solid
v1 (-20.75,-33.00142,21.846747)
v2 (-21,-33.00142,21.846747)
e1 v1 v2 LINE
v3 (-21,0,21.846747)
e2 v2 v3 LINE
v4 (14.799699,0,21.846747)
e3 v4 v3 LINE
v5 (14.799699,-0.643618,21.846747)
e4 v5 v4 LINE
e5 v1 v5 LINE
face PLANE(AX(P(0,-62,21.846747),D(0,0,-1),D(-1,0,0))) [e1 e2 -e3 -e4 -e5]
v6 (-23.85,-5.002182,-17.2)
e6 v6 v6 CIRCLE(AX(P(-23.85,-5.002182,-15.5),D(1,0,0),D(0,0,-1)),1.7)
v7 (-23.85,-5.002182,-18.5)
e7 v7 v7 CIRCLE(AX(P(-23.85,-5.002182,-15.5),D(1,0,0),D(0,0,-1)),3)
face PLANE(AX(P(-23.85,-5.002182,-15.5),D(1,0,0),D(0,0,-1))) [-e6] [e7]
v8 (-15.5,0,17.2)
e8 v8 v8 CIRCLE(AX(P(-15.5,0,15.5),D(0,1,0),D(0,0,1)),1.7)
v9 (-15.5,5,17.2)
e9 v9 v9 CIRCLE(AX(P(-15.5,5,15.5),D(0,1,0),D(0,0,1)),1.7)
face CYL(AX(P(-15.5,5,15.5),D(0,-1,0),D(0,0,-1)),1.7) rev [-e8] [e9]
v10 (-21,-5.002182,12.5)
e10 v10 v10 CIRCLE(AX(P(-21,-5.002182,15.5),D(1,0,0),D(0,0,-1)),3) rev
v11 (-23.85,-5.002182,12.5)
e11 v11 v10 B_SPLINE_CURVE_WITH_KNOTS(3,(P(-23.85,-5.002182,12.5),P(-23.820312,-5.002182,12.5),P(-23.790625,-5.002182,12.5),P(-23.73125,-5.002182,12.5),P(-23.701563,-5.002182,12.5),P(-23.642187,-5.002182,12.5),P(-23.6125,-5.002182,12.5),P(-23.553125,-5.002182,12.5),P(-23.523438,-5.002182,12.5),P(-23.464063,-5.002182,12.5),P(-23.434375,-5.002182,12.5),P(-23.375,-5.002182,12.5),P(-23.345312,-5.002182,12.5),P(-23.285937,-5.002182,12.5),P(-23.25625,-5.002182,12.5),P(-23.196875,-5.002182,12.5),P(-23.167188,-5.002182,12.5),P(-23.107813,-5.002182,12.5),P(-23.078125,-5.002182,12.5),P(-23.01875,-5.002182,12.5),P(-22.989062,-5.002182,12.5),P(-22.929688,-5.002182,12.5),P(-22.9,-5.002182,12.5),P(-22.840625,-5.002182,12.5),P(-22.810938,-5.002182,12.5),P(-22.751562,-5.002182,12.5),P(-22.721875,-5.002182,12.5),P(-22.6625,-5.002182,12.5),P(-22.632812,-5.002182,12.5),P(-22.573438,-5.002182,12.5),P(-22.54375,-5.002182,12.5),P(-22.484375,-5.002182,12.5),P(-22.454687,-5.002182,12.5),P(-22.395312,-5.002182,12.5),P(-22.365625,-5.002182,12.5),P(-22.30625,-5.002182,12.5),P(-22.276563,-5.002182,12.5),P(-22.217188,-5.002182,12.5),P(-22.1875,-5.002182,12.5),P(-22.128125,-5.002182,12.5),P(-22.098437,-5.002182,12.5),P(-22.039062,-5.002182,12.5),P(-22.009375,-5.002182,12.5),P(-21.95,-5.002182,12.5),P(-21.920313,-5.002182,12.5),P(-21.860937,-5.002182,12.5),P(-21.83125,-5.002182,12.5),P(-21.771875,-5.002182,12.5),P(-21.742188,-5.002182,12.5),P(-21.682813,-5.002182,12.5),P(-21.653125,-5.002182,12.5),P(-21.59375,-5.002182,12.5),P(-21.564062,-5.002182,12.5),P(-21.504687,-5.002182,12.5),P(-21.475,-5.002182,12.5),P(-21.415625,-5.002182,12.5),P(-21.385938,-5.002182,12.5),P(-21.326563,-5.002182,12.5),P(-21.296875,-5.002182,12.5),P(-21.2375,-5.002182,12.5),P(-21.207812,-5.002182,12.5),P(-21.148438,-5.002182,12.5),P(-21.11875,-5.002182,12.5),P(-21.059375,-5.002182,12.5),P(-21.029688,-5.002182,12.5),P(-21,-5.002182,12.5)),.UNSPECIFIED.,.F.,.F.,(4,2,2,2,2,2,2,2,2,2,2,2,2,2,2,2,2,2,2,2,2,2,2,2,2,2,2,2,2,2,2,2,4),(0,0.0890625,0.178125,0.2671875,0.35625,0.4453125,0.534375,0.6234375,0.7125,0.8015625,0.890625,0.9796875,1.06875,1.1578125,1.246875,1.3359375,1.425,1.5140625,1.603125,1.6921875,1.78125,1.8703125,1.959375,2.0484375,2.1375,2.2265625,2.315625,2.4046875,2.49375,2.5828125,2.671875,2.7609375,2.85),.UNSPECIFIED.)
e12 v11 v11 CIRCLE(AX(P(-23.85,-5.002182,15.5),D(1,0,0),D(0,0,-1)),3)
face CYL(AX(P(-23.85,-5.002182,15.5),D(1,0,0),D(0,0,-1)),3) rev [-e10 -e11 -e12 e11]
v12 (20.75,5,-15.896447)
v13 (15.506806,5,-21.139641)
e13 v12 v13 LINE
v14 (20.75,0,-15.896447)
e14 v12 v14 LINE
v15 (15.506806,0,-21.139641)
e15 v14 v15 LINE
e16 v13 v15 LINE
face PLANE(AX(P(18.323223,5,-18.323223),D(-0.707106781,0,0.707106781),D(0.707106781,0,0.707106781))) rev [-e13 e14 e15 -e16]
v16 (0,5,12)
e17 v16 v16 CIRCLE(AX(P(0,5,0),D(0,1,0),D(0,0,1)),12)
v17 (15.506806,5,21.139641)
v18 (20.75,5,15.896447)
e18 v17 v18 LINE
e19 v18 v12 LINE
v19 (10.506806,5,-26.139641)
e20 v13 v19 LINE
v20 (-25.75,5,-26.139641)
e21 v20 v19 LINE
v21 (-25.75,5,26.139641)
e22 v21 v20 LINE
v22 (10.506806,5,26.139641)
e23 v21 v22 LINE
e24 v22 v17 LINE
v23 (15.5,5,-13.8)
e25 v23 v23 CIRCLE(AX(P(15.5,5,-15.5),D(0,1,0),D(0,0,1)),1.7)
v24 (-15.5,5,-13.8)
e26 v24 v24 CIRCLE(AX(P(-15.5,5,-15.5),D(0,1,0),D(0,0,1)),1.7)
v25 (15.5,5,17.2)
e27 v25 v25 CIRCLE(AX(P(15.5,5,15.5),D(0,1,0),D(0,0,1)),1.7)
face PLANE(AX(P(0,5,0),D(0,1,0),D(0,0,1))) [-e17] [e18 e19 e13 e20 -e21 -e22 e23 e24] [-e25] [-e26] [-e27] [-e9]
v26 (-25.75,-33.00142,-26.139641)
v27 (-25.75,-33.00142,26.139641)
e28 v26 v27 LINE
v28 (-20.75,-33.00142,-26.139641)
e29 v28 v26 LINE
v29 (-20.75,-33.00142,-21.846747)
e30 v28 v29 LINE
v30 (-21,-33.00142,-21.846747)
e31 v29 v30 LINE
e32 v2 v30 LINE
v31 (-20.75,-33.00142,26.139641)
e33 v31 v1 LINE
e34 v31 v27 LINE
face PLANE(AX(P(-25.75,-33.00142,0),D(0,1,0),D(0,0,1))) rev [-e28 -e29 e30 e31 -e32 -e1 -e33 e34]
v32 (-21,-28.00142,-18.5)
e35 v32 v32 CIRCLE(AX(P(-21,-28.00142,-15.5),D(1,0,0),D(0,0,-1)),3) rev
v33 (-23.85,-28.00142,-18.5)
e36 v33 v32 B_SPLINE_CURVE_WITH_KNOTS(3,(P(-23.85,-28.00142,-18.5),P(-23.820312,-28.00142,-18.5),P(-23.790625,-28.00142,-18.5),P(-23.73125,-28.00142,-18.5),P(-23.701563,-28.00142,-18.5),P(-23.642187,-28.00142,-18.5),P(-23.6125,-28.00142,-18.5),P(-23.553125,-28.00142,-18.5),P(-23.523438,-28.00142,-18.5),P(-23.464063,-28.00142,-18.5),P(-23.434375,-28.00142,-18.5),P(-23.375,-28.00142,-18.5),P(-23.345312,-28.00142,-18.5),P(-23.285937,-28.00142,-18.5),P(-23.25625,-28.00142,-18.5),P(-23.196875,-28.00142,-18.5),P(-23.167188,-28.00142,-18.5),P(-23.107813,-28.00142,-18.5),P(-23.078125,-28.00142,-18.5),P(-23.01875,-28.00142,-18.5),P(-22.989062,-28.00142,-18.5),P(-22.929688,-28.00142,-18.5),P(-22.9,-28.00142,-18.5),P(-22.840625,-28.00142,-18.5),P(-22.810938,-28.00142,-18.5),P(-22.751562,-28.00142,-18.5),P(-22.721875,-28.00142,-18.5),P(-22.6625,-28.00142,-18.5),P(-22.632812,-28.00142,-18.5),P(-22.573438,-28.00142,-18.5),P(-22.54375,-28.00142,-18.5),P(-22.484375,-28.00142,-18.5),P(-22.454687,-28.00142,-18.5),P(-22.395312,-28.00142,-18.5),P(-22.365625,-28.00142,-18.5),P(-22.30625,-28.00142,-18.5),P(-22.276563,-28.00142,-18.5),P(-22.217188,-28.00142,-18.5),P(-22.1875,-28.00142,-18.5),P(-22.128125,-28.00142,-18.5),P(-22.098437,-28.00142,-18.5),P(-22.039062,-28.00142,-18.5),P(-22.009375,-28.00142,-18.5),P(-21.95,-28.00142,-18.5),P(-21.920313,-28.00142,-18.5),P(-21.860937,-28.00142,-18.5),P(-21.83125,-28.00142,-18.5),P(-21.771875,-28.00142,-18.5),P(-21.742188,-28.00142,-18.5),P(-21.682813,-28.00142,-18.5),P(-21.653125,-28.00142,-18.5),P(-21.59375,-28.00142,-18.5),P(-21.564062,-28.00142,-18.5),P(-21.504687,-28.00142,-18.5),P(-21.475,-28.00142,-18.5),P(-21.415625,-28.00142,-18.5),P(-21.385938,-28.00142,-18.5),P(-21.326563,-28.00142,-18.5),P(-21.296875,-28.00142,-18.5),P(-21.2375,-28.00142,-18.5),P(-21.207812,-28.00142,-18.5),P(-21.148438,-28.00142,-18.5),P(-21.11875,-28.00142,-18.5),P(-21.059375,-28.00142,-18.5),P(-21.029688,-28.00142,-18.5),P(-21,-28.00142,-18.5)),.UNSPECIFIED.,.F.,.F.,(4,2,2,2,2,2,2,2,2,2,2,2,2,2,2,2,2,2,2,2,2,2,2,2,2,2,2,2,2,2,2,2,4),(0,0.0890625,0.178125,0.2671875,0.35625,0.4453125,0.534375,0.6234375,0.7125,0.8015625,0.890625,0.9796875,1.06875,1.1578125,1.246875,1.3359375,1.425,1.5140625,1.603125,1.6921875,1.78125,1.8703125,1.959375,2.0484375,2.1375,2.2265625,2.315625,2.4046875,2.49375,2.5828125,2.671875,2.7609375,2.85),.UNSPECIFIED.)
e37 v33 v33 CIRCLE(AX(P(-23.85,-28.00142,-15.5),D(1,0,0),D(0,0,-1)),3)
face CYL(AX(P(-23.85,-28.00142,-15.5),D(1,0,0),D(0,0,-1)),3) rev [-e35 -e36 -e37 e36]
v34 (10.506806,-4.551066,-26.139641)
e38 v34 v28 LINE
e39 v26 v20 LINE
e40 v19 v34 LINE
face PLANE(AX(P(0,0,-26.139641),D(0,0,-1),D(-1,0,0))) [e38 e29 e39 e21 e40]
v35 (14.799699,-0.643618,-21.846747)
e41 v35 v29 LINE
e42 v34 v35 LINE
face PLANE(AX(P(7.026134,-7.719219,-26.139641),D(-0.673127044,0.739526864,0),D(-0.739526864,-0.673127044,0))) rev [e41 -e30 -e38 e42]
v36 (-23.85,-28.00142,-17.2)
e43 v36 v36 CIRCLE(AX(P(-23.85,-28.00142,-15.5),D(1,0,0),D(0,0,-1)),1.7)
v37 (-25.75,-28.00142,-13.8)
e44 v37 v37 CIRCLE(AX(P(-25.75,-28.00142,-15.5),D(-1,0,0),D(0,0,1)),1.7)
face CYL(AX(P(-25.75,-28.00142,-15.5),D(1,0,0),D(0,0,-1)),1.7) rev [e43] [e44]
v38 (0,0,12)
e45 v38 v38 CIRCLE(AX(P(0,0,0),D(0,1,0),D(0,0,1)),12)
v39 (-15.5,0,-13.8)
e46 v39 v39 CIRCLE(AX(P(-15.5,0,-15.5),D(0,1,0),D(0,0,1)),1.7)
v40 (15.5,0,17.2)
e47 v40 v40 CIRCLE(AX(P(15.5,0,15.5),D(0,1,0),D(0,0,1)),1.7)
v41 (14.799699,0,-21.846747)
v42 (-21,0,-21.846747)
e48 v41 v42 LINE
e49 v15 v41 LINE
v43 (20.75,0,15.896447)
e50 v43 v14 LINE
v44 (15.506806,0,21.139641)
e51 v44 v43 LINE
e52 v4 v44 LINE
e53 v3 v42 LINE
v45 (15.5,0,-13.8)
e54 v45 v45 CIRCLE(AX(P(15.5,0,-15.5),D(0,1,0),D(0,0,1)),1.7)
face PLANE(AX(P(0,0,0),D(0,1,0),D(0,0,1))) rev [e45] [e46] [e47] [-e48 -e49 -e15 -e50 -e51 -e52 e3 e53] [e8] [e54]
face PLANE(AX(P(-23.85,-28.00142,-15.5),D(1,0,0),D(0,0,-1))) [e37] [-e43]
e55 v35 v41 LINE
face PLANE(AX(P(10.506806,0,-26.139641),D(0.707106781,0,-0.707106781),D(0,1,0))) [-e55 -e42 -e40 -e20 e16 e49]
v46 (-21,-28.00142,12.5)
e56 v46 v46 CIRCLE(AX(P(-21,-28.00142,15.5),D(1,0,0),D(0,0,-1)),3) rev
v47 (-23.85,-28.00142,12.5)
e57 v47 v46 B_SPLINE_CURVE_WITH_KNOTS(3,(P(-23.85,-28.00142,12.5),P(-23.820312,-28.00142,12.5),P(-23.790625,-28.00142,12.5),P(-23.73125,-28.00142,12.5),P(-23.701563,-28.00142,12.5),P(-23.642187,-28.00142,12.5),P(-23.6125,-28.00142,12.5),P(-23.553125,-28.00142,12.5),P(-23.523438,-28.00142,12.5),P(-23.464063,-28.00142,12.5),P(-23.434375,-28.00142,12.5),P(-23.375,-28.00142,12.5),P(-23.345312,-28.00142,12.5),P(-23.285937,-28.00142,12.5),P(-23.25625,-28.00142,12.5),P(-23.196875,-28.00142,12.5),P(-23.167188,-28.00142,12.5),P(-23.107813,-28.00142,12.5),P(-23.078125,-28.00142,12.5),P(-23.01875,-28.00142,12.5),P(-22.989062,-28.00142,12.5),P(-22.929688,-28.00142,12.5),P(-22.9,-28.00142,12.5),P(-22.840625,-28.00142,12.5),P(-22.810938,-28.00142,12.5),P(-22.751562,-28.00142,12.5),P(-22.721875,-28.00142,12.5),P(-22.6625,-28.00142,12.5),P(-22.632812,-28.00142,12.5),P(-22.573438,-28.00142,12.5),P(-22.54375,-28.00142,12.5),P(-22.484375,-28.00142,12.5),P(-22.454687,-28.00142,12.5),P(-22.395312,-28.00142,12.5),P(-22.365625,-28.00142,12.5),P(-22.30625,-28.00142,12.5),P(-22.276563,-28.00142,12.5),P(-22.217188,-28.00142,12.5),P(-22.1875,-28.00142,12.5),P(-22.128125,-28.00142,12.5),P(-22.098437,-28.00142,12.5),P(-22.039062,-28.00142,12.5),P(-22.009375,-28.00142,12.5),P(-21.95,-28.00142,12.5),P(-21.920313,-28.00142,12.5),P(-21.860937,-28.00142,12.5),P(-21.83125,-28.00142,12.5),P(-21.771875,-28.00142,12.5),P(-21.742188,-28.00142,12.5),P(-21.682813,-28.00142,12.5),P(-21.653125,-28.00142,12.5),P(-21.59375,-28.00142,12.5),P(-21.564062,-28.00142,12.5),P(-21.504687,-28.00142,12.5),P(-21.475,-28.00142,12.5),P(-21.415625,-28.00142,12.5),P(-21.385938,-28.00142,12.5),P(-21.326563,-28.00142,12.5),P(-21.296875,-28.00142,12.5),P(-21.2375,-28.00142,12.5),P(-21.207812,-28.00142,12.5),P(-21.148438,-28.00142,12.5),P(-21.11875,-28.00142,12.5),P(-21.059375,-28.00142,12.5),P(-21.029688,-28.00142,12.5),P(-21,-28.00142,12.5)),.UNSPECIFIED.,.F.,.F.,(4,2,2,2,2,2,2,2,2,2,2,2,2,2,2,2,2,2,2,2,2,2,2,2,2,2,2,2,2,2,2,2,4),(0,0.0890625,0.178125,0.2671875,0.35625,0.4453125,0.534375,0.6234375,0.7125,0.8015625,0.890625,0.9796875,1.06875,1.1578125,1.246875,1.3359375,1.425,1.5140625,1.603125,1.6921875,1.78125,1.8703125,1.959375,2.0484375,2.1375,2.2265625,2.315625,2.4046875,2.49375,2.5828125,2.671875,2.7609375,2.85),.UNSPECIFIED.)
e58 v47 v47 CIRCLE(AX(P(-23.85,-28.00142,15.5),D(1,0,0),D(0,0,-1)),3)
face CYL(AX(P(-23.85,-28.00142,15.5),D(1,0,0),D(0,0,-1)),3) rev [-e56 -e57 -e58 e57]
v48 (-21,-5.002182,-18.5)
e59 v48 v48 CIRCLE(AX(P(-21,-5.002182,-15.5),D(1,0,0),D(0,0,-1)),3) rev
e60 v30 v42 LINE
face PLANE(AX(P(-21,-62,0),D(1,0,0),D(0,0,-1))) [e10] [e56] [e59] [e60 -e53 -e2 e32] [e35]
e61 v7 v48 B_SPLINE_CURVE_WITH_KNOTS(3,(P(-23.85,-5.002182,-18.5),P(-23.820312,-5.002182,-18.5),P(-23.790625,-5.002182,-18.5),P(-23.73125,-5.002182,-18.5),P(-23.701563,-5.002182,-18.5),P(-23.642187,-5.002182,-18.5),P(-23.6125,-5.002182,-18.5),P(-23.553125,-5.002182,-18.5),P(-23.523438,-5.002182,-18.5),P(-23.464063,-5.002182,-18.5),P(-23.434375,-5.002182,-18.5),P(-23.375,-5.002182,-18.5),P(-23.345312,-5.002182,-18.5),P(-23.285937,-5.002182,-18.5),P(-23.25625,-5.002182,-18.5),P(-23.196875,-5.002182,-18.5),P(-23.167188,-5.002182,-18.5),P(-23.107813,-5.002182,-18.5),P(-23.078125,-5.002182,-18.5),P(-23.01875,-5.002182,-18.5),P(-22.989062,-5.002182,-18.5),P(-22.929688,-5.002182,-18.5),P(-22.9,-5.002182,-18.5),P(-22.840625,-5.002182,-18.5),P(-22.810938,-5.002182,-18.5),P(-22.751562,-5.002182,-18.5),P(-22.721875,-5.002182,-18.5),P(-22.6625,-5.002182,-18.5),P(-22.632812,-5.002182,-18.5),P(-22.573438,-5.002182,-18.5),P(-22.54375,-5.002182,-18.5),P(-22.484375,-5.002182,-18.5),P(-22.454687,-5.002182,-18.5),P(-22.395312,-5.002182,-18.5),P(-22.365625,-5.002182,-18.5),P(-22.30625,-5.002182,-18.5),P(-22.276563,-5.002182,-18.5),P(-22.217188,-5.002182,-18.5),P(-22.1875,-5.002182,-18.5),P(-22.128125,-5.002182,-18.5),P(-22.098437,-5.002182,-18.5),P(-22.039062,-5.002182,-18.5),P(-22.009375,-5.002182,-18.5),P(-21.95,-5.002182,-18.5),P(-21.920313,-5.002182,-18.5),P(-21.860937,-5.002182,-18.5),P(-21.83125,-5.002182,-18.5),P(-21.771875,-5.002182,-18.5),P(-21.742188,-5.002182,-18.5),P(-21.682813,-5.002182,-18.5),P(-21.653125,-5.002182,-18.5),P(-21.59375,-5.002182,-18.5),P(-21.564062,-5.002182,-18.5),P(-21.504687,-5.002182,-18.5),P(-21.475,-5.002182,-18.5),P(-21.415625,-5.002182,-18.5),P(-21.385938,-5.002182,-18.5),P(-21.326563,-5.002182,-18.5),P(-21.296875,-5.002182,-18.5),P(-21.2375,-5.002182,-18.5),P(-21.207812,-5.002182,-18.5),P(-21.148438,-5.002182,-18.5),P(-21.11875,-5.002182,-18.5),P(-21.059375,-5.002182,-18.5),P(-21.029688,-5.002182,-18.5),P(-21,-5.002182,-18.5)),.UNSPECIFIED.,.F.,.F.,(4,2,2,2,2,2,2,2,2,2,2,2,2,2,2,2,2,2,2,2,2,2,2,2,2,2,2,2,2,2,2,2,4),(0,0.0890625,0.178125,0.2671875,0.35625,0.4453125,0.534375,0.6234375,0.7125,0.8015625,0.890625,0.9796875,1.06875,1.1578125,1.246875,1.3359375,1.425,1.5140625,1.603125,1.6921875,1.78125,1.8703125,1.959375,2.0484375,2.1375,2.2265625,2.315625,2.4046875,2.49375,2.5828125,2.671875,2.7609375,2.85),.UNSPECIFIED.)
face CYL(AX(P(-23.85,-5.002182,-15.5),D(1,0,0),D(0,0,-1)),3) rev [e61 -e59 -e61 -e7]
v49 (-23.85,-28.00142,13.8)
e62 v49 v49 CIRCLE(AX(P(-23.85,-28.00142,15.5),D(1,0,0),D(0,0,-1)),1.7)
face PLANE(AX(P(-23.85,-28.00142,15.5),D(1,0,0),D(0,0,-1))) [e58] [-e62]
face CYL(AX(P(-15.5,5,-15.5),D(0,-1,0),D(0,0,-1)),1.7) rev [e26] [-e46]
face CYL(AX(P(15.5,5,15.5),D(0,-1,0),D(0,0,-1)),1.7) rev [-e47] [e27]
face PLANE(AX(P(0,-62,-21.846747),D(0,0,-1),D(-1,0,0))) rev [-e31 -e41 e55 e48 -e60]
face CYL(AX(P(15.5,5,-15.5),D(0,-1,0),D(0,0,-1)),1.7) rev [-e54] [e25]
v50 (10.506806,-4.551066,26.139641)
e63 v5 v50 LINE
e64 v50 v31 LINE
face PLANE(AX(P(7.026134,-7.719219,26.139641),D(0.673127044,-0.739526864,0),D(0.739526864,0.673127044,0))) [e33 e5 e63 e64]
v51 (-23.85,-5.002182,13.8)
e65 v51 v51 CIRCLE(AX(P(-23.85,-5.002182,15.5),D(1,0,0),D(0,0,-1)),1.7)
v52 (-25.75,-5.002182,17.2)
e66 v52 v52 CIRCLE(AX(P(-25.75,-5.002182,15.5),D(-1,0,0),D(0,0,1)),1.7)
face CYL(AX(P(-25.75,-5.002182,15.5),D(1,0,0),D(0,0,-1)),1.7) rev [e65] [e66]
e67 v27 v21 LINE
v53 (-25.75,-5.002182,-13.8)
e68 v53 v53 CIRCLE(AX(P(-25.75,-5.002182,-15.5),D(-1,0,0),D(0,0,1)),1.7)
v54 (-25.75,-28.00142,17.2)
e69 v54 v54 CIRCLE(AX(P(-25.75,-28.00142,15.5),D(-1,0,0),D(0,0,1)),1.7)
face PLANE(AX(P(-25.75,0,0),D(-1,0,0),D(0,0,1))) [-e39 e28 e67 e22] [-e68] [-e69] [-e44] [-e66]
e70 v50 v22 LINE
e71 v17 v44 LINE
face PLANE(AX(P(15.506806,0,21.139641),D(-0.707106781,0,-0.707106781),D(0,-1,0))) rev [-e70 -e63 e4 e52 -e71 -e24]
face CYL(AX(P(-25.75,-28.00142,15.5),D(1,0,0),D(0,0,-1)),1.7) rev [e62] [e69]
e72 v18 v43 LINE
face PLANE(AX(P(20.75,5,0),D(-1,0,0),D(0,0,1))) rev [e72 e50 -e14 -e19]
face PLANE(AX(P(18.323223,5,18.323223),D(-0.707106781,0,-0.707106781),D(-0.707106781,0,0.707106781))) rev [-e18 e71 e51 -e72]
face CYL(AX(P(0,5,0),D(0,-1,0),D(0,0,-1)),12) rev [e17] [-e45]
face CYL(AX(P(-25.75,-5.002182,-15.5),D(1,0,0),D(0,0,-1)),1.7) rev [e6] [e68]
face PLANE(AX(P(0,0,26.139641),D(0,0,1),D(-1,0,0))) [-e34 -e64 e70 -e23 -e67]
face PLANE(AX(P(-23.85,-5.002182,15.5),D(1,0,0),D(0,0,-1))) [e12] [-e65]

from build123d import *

# Parameters (mm, degrees)
SKETCH1_R                = 12
SKETCH1_R_2              = 1.7
BOSS_EXTRUDE1_DEPTH      = 5
BOSS_EXTRUDE3_DEPTH      = 5
BOSS_EXTRUDE4_DEPTH      = 5
CHAMFER1_SIZE            = 5
CHAMFER1_OF_MIRROR1_SIZE = 5
SKETCH7_R                = 3
CUT_EXTRUDE1_DEPTH       = 3.1
CUT_EXTRUDE2_DEPTH       = 33.001420077


# Read off the part's stored shape, not the designer's step: Cut-Extrude2
with BuildPart() as part:
    # Sketch1 → Boss-Extrude1 (new body)
    with BuildSketch(Plane(origin=(0, 0, 0), x_dir=(1, 0, 0), z_dir=(0, 1, 0))):
        Polygon((-20.75, 21.139640519), (-20.75, -21.139640519), (15.50680609, -21.139640519), (20.75, -15.896446609), (20.75, 15.896446609), (15.50680609, 21.139640519), align=None)
        with Locations(Location((0, 0, 0), (0, 0, 270))):
            Circle(SKETCH1_R, mode=Mode.SUBTRACT)
        with Locations(Location((15.5, 15.5, 0), (0, 0, 270))):
            Circle(SKETCH1_R_2, mode=Mode.SUBTRACT)
        with Locations(Location((-15.5, -15.5, 0), (0, 0, 270))):
            Circle(SKETCH1_R_2, mode=Mode.SUBTRACT)
        with Locations(Location((15.5, -15.5, 0), (0, 0, 270))):
            Circle(SKETCH1_R_2, mode=Mode.SUBTRACT)
        with Locations(Location((-15.5, 15.5, 0), (0, 0, 270))):
            Circle(SKETCH1_R_2, mode=Mode.SUBTRACT)
    extrude(amount=BOSS_EXTRUDE1_DEPTH)

    # Sketch3 → Boss-Extrude3 (add)
    with BuildSketch(Plane(origin=(-20.75, 0.364318818, 0), x_dir=(0, 0, 1), z_dir=(-1, 0, 0))):
        Polygon((-21.139640519, 4.635681182), (-21.139640519, 4.634261105), (-21.139640519, -0.364318818), (21.139640519, -0.364318818), (21.139640519, 4.634261105), (21.139640519, 4.635681182), align=None)
        with BuildLine():
            Line((21.139640519, -0.364318818), (-21.139640519, -0.364318818))
            Line((-21.139640519, -0.364318818), (-21.139640519, -5.366500535))
            Line((-21.139640519, -5.366500535), (-17.2, -5.366500535))
            ThreePointArc((-17.2, -5.366500535), (-15.5, -3.666500535), (-13.8, -5.366500535))
            Line((-13.8, -5.366500535), (13.8, -5.366500535))
            ThreePointArc((13.8, -5.366500535), (15.5, -3.666500535), (17.2, -5.366500535))
            Line((17.2, -5.366500535), (21.139640519, -5.366500535))
            Line((21.139640519, -5.366500535), (21.139640519, -0.364318818))
        make_face()
        with BuildLine():
            Line((-17.2, -5.366500535), (-21.139640519, -5.366500535))
            Line((-21.139640519, -5.366500535), (-21.139640519, -28.365738895))
            Line((-21.139640519, -28.365738895), (-17.2, -28.365738895))
            ThreePointArc((-17.2, -28.365738895), (-15.5, -26.665738895), (-13.8, -28.365738895))
            Line((-13.8, -28.365738895), (13.8, -28.365738895))
            ThreePointArc((13.8, -28.365738895), (15.5, -26.665738895), (17.2, -28.365738895))
            Line((17.2, -28.365738895), (21.139640519, -28.365738895))
            Line((21.139640519, -28.365738895), (21.139640519, -5.366500535))
            Line((21.139640519, -5.366500535), (17.2, -5.366500535))
            ThreePointArc((17.2, -5.366500535), (15.5, -7.066500535), (13.8, -5.366500535))
            Line((13.8, -5.366500535), (-13.8, -5.366500535))
            ThreePointArc((-13.8, -5.366500535), (-15.5, -7.066500535), (-17.2, -5.366500535))
        make_face()
        with BuildLine():
            Line((-17.2, -28.365738895), (-21.139640519, -28.365738895))
            Line((-21.139640519, -28.365738895), (-21.139640519, -33.365738895))
            Line((-21.139640519, -33.365738895), (21.139640519, -33.365738895))
            Line((21.139640519, -33.365738895), (21.139640519, -28.365738895))
            Line((21.139640519, -28.365738895), (17.2, -28.365738895))
            ThreePointArc((17.2, -28.365738895), (15.5, -30.065738895), (13.8, -28.365738895))
            Line((13.8, -28.365738895), (-13.8, -28.365738895))
            ThreePointArc((-13.8, -28.365738895), (-15.5, -30.065738895), (-17.2, -28.365738895))
        make_face()
    extrude(amount=BOSS_EXTRUDE3_DEPTH)

    # Sketch6 → Boss-Extrude4 (add)
    with BuildSketch(Plane(origin=(0, 0, -21.139640519), x_dir=(-1, 0, 0), z_dir=(0, 0, -1))):
        Polygon((-15.50680609, 0), (20.75, -33.001420077), (25.75, -33.001420077), (25.75, 5), (-15.50680609, 5), align=None)
    boss_extrude4 = extrude(amount=BOSS_EXTRUDE4_DEPTH)

    # Chamfer1
    chamfer1_edges = [part.edges().sort_by_distance(p)[0] for p in [
        (15.50680609, 2.5, -26.139640519),
    ]]
    chamfer(chamfer1_edges, length=CHAMFER1_SIZE - 0.0001)  # a hair under: the kernel refuses the full size

    # Mirror1: Boss-Extrude4 across plane
    add(boss_extrude4.mirror(Plane(origin=(0, 0, 0), x_dir=(1, 0, 0), z_dir=(0, 0, -1))))

    # Chamfer1 of Mirror1
    chamfer1_of_mirror1_edges = [part.edges().sort_by_distance(p)[0] for p in [
        (15.50680609, 2.5, 26.139640519),
    ]]
    chamfer(chamfer1_of_mirror1_edges, length=CHAMFER1_OF_MIRROR1_SIZE - 0.0001)  # a hair under: the kernel refuses the full size

    # Sketch7 → Cut-Extrude1 (cut)
    with BuildSketch(Plane(origin=(-20.75, 0, 0), x_dir=(0, 0, -1), z_dir=(1, 0, 0))):
        with Locations((-15.5, -5.002181717)):
            Circle(SKETCH7_R)
        with Locations((15.5, -5.002181717)):
            Circle(SKETCH7_R)
        with Locations((-15.5, -28.001420077)):
            Circle(SKETCH7_R)
        with Locations((15.5, -28.001420077)):
            Circle(SKETCH7_R)
    extrude(amount=-CUT_EXTRUDE1_DEPTH, mode=Mode.SUBTRACT)

    # Cut-Extrude2 outline → Cut-Extrude2 (cut)
    with BuildSketch(Plane.XZ):
        Polygon((-21, 21.846747301), (-21, -21.846747301), (17, -21.846747301), (17, -21.139640519), (-20.75, -21.139640519), (-20.75, 21.139640519), (17, 21.139640519), (17, 21.846747301), align=None)
    extrude(amount=CUT_EXTRUDE2_DEPTH, mode=Mode.SUBTRACT)


solid = part.part
